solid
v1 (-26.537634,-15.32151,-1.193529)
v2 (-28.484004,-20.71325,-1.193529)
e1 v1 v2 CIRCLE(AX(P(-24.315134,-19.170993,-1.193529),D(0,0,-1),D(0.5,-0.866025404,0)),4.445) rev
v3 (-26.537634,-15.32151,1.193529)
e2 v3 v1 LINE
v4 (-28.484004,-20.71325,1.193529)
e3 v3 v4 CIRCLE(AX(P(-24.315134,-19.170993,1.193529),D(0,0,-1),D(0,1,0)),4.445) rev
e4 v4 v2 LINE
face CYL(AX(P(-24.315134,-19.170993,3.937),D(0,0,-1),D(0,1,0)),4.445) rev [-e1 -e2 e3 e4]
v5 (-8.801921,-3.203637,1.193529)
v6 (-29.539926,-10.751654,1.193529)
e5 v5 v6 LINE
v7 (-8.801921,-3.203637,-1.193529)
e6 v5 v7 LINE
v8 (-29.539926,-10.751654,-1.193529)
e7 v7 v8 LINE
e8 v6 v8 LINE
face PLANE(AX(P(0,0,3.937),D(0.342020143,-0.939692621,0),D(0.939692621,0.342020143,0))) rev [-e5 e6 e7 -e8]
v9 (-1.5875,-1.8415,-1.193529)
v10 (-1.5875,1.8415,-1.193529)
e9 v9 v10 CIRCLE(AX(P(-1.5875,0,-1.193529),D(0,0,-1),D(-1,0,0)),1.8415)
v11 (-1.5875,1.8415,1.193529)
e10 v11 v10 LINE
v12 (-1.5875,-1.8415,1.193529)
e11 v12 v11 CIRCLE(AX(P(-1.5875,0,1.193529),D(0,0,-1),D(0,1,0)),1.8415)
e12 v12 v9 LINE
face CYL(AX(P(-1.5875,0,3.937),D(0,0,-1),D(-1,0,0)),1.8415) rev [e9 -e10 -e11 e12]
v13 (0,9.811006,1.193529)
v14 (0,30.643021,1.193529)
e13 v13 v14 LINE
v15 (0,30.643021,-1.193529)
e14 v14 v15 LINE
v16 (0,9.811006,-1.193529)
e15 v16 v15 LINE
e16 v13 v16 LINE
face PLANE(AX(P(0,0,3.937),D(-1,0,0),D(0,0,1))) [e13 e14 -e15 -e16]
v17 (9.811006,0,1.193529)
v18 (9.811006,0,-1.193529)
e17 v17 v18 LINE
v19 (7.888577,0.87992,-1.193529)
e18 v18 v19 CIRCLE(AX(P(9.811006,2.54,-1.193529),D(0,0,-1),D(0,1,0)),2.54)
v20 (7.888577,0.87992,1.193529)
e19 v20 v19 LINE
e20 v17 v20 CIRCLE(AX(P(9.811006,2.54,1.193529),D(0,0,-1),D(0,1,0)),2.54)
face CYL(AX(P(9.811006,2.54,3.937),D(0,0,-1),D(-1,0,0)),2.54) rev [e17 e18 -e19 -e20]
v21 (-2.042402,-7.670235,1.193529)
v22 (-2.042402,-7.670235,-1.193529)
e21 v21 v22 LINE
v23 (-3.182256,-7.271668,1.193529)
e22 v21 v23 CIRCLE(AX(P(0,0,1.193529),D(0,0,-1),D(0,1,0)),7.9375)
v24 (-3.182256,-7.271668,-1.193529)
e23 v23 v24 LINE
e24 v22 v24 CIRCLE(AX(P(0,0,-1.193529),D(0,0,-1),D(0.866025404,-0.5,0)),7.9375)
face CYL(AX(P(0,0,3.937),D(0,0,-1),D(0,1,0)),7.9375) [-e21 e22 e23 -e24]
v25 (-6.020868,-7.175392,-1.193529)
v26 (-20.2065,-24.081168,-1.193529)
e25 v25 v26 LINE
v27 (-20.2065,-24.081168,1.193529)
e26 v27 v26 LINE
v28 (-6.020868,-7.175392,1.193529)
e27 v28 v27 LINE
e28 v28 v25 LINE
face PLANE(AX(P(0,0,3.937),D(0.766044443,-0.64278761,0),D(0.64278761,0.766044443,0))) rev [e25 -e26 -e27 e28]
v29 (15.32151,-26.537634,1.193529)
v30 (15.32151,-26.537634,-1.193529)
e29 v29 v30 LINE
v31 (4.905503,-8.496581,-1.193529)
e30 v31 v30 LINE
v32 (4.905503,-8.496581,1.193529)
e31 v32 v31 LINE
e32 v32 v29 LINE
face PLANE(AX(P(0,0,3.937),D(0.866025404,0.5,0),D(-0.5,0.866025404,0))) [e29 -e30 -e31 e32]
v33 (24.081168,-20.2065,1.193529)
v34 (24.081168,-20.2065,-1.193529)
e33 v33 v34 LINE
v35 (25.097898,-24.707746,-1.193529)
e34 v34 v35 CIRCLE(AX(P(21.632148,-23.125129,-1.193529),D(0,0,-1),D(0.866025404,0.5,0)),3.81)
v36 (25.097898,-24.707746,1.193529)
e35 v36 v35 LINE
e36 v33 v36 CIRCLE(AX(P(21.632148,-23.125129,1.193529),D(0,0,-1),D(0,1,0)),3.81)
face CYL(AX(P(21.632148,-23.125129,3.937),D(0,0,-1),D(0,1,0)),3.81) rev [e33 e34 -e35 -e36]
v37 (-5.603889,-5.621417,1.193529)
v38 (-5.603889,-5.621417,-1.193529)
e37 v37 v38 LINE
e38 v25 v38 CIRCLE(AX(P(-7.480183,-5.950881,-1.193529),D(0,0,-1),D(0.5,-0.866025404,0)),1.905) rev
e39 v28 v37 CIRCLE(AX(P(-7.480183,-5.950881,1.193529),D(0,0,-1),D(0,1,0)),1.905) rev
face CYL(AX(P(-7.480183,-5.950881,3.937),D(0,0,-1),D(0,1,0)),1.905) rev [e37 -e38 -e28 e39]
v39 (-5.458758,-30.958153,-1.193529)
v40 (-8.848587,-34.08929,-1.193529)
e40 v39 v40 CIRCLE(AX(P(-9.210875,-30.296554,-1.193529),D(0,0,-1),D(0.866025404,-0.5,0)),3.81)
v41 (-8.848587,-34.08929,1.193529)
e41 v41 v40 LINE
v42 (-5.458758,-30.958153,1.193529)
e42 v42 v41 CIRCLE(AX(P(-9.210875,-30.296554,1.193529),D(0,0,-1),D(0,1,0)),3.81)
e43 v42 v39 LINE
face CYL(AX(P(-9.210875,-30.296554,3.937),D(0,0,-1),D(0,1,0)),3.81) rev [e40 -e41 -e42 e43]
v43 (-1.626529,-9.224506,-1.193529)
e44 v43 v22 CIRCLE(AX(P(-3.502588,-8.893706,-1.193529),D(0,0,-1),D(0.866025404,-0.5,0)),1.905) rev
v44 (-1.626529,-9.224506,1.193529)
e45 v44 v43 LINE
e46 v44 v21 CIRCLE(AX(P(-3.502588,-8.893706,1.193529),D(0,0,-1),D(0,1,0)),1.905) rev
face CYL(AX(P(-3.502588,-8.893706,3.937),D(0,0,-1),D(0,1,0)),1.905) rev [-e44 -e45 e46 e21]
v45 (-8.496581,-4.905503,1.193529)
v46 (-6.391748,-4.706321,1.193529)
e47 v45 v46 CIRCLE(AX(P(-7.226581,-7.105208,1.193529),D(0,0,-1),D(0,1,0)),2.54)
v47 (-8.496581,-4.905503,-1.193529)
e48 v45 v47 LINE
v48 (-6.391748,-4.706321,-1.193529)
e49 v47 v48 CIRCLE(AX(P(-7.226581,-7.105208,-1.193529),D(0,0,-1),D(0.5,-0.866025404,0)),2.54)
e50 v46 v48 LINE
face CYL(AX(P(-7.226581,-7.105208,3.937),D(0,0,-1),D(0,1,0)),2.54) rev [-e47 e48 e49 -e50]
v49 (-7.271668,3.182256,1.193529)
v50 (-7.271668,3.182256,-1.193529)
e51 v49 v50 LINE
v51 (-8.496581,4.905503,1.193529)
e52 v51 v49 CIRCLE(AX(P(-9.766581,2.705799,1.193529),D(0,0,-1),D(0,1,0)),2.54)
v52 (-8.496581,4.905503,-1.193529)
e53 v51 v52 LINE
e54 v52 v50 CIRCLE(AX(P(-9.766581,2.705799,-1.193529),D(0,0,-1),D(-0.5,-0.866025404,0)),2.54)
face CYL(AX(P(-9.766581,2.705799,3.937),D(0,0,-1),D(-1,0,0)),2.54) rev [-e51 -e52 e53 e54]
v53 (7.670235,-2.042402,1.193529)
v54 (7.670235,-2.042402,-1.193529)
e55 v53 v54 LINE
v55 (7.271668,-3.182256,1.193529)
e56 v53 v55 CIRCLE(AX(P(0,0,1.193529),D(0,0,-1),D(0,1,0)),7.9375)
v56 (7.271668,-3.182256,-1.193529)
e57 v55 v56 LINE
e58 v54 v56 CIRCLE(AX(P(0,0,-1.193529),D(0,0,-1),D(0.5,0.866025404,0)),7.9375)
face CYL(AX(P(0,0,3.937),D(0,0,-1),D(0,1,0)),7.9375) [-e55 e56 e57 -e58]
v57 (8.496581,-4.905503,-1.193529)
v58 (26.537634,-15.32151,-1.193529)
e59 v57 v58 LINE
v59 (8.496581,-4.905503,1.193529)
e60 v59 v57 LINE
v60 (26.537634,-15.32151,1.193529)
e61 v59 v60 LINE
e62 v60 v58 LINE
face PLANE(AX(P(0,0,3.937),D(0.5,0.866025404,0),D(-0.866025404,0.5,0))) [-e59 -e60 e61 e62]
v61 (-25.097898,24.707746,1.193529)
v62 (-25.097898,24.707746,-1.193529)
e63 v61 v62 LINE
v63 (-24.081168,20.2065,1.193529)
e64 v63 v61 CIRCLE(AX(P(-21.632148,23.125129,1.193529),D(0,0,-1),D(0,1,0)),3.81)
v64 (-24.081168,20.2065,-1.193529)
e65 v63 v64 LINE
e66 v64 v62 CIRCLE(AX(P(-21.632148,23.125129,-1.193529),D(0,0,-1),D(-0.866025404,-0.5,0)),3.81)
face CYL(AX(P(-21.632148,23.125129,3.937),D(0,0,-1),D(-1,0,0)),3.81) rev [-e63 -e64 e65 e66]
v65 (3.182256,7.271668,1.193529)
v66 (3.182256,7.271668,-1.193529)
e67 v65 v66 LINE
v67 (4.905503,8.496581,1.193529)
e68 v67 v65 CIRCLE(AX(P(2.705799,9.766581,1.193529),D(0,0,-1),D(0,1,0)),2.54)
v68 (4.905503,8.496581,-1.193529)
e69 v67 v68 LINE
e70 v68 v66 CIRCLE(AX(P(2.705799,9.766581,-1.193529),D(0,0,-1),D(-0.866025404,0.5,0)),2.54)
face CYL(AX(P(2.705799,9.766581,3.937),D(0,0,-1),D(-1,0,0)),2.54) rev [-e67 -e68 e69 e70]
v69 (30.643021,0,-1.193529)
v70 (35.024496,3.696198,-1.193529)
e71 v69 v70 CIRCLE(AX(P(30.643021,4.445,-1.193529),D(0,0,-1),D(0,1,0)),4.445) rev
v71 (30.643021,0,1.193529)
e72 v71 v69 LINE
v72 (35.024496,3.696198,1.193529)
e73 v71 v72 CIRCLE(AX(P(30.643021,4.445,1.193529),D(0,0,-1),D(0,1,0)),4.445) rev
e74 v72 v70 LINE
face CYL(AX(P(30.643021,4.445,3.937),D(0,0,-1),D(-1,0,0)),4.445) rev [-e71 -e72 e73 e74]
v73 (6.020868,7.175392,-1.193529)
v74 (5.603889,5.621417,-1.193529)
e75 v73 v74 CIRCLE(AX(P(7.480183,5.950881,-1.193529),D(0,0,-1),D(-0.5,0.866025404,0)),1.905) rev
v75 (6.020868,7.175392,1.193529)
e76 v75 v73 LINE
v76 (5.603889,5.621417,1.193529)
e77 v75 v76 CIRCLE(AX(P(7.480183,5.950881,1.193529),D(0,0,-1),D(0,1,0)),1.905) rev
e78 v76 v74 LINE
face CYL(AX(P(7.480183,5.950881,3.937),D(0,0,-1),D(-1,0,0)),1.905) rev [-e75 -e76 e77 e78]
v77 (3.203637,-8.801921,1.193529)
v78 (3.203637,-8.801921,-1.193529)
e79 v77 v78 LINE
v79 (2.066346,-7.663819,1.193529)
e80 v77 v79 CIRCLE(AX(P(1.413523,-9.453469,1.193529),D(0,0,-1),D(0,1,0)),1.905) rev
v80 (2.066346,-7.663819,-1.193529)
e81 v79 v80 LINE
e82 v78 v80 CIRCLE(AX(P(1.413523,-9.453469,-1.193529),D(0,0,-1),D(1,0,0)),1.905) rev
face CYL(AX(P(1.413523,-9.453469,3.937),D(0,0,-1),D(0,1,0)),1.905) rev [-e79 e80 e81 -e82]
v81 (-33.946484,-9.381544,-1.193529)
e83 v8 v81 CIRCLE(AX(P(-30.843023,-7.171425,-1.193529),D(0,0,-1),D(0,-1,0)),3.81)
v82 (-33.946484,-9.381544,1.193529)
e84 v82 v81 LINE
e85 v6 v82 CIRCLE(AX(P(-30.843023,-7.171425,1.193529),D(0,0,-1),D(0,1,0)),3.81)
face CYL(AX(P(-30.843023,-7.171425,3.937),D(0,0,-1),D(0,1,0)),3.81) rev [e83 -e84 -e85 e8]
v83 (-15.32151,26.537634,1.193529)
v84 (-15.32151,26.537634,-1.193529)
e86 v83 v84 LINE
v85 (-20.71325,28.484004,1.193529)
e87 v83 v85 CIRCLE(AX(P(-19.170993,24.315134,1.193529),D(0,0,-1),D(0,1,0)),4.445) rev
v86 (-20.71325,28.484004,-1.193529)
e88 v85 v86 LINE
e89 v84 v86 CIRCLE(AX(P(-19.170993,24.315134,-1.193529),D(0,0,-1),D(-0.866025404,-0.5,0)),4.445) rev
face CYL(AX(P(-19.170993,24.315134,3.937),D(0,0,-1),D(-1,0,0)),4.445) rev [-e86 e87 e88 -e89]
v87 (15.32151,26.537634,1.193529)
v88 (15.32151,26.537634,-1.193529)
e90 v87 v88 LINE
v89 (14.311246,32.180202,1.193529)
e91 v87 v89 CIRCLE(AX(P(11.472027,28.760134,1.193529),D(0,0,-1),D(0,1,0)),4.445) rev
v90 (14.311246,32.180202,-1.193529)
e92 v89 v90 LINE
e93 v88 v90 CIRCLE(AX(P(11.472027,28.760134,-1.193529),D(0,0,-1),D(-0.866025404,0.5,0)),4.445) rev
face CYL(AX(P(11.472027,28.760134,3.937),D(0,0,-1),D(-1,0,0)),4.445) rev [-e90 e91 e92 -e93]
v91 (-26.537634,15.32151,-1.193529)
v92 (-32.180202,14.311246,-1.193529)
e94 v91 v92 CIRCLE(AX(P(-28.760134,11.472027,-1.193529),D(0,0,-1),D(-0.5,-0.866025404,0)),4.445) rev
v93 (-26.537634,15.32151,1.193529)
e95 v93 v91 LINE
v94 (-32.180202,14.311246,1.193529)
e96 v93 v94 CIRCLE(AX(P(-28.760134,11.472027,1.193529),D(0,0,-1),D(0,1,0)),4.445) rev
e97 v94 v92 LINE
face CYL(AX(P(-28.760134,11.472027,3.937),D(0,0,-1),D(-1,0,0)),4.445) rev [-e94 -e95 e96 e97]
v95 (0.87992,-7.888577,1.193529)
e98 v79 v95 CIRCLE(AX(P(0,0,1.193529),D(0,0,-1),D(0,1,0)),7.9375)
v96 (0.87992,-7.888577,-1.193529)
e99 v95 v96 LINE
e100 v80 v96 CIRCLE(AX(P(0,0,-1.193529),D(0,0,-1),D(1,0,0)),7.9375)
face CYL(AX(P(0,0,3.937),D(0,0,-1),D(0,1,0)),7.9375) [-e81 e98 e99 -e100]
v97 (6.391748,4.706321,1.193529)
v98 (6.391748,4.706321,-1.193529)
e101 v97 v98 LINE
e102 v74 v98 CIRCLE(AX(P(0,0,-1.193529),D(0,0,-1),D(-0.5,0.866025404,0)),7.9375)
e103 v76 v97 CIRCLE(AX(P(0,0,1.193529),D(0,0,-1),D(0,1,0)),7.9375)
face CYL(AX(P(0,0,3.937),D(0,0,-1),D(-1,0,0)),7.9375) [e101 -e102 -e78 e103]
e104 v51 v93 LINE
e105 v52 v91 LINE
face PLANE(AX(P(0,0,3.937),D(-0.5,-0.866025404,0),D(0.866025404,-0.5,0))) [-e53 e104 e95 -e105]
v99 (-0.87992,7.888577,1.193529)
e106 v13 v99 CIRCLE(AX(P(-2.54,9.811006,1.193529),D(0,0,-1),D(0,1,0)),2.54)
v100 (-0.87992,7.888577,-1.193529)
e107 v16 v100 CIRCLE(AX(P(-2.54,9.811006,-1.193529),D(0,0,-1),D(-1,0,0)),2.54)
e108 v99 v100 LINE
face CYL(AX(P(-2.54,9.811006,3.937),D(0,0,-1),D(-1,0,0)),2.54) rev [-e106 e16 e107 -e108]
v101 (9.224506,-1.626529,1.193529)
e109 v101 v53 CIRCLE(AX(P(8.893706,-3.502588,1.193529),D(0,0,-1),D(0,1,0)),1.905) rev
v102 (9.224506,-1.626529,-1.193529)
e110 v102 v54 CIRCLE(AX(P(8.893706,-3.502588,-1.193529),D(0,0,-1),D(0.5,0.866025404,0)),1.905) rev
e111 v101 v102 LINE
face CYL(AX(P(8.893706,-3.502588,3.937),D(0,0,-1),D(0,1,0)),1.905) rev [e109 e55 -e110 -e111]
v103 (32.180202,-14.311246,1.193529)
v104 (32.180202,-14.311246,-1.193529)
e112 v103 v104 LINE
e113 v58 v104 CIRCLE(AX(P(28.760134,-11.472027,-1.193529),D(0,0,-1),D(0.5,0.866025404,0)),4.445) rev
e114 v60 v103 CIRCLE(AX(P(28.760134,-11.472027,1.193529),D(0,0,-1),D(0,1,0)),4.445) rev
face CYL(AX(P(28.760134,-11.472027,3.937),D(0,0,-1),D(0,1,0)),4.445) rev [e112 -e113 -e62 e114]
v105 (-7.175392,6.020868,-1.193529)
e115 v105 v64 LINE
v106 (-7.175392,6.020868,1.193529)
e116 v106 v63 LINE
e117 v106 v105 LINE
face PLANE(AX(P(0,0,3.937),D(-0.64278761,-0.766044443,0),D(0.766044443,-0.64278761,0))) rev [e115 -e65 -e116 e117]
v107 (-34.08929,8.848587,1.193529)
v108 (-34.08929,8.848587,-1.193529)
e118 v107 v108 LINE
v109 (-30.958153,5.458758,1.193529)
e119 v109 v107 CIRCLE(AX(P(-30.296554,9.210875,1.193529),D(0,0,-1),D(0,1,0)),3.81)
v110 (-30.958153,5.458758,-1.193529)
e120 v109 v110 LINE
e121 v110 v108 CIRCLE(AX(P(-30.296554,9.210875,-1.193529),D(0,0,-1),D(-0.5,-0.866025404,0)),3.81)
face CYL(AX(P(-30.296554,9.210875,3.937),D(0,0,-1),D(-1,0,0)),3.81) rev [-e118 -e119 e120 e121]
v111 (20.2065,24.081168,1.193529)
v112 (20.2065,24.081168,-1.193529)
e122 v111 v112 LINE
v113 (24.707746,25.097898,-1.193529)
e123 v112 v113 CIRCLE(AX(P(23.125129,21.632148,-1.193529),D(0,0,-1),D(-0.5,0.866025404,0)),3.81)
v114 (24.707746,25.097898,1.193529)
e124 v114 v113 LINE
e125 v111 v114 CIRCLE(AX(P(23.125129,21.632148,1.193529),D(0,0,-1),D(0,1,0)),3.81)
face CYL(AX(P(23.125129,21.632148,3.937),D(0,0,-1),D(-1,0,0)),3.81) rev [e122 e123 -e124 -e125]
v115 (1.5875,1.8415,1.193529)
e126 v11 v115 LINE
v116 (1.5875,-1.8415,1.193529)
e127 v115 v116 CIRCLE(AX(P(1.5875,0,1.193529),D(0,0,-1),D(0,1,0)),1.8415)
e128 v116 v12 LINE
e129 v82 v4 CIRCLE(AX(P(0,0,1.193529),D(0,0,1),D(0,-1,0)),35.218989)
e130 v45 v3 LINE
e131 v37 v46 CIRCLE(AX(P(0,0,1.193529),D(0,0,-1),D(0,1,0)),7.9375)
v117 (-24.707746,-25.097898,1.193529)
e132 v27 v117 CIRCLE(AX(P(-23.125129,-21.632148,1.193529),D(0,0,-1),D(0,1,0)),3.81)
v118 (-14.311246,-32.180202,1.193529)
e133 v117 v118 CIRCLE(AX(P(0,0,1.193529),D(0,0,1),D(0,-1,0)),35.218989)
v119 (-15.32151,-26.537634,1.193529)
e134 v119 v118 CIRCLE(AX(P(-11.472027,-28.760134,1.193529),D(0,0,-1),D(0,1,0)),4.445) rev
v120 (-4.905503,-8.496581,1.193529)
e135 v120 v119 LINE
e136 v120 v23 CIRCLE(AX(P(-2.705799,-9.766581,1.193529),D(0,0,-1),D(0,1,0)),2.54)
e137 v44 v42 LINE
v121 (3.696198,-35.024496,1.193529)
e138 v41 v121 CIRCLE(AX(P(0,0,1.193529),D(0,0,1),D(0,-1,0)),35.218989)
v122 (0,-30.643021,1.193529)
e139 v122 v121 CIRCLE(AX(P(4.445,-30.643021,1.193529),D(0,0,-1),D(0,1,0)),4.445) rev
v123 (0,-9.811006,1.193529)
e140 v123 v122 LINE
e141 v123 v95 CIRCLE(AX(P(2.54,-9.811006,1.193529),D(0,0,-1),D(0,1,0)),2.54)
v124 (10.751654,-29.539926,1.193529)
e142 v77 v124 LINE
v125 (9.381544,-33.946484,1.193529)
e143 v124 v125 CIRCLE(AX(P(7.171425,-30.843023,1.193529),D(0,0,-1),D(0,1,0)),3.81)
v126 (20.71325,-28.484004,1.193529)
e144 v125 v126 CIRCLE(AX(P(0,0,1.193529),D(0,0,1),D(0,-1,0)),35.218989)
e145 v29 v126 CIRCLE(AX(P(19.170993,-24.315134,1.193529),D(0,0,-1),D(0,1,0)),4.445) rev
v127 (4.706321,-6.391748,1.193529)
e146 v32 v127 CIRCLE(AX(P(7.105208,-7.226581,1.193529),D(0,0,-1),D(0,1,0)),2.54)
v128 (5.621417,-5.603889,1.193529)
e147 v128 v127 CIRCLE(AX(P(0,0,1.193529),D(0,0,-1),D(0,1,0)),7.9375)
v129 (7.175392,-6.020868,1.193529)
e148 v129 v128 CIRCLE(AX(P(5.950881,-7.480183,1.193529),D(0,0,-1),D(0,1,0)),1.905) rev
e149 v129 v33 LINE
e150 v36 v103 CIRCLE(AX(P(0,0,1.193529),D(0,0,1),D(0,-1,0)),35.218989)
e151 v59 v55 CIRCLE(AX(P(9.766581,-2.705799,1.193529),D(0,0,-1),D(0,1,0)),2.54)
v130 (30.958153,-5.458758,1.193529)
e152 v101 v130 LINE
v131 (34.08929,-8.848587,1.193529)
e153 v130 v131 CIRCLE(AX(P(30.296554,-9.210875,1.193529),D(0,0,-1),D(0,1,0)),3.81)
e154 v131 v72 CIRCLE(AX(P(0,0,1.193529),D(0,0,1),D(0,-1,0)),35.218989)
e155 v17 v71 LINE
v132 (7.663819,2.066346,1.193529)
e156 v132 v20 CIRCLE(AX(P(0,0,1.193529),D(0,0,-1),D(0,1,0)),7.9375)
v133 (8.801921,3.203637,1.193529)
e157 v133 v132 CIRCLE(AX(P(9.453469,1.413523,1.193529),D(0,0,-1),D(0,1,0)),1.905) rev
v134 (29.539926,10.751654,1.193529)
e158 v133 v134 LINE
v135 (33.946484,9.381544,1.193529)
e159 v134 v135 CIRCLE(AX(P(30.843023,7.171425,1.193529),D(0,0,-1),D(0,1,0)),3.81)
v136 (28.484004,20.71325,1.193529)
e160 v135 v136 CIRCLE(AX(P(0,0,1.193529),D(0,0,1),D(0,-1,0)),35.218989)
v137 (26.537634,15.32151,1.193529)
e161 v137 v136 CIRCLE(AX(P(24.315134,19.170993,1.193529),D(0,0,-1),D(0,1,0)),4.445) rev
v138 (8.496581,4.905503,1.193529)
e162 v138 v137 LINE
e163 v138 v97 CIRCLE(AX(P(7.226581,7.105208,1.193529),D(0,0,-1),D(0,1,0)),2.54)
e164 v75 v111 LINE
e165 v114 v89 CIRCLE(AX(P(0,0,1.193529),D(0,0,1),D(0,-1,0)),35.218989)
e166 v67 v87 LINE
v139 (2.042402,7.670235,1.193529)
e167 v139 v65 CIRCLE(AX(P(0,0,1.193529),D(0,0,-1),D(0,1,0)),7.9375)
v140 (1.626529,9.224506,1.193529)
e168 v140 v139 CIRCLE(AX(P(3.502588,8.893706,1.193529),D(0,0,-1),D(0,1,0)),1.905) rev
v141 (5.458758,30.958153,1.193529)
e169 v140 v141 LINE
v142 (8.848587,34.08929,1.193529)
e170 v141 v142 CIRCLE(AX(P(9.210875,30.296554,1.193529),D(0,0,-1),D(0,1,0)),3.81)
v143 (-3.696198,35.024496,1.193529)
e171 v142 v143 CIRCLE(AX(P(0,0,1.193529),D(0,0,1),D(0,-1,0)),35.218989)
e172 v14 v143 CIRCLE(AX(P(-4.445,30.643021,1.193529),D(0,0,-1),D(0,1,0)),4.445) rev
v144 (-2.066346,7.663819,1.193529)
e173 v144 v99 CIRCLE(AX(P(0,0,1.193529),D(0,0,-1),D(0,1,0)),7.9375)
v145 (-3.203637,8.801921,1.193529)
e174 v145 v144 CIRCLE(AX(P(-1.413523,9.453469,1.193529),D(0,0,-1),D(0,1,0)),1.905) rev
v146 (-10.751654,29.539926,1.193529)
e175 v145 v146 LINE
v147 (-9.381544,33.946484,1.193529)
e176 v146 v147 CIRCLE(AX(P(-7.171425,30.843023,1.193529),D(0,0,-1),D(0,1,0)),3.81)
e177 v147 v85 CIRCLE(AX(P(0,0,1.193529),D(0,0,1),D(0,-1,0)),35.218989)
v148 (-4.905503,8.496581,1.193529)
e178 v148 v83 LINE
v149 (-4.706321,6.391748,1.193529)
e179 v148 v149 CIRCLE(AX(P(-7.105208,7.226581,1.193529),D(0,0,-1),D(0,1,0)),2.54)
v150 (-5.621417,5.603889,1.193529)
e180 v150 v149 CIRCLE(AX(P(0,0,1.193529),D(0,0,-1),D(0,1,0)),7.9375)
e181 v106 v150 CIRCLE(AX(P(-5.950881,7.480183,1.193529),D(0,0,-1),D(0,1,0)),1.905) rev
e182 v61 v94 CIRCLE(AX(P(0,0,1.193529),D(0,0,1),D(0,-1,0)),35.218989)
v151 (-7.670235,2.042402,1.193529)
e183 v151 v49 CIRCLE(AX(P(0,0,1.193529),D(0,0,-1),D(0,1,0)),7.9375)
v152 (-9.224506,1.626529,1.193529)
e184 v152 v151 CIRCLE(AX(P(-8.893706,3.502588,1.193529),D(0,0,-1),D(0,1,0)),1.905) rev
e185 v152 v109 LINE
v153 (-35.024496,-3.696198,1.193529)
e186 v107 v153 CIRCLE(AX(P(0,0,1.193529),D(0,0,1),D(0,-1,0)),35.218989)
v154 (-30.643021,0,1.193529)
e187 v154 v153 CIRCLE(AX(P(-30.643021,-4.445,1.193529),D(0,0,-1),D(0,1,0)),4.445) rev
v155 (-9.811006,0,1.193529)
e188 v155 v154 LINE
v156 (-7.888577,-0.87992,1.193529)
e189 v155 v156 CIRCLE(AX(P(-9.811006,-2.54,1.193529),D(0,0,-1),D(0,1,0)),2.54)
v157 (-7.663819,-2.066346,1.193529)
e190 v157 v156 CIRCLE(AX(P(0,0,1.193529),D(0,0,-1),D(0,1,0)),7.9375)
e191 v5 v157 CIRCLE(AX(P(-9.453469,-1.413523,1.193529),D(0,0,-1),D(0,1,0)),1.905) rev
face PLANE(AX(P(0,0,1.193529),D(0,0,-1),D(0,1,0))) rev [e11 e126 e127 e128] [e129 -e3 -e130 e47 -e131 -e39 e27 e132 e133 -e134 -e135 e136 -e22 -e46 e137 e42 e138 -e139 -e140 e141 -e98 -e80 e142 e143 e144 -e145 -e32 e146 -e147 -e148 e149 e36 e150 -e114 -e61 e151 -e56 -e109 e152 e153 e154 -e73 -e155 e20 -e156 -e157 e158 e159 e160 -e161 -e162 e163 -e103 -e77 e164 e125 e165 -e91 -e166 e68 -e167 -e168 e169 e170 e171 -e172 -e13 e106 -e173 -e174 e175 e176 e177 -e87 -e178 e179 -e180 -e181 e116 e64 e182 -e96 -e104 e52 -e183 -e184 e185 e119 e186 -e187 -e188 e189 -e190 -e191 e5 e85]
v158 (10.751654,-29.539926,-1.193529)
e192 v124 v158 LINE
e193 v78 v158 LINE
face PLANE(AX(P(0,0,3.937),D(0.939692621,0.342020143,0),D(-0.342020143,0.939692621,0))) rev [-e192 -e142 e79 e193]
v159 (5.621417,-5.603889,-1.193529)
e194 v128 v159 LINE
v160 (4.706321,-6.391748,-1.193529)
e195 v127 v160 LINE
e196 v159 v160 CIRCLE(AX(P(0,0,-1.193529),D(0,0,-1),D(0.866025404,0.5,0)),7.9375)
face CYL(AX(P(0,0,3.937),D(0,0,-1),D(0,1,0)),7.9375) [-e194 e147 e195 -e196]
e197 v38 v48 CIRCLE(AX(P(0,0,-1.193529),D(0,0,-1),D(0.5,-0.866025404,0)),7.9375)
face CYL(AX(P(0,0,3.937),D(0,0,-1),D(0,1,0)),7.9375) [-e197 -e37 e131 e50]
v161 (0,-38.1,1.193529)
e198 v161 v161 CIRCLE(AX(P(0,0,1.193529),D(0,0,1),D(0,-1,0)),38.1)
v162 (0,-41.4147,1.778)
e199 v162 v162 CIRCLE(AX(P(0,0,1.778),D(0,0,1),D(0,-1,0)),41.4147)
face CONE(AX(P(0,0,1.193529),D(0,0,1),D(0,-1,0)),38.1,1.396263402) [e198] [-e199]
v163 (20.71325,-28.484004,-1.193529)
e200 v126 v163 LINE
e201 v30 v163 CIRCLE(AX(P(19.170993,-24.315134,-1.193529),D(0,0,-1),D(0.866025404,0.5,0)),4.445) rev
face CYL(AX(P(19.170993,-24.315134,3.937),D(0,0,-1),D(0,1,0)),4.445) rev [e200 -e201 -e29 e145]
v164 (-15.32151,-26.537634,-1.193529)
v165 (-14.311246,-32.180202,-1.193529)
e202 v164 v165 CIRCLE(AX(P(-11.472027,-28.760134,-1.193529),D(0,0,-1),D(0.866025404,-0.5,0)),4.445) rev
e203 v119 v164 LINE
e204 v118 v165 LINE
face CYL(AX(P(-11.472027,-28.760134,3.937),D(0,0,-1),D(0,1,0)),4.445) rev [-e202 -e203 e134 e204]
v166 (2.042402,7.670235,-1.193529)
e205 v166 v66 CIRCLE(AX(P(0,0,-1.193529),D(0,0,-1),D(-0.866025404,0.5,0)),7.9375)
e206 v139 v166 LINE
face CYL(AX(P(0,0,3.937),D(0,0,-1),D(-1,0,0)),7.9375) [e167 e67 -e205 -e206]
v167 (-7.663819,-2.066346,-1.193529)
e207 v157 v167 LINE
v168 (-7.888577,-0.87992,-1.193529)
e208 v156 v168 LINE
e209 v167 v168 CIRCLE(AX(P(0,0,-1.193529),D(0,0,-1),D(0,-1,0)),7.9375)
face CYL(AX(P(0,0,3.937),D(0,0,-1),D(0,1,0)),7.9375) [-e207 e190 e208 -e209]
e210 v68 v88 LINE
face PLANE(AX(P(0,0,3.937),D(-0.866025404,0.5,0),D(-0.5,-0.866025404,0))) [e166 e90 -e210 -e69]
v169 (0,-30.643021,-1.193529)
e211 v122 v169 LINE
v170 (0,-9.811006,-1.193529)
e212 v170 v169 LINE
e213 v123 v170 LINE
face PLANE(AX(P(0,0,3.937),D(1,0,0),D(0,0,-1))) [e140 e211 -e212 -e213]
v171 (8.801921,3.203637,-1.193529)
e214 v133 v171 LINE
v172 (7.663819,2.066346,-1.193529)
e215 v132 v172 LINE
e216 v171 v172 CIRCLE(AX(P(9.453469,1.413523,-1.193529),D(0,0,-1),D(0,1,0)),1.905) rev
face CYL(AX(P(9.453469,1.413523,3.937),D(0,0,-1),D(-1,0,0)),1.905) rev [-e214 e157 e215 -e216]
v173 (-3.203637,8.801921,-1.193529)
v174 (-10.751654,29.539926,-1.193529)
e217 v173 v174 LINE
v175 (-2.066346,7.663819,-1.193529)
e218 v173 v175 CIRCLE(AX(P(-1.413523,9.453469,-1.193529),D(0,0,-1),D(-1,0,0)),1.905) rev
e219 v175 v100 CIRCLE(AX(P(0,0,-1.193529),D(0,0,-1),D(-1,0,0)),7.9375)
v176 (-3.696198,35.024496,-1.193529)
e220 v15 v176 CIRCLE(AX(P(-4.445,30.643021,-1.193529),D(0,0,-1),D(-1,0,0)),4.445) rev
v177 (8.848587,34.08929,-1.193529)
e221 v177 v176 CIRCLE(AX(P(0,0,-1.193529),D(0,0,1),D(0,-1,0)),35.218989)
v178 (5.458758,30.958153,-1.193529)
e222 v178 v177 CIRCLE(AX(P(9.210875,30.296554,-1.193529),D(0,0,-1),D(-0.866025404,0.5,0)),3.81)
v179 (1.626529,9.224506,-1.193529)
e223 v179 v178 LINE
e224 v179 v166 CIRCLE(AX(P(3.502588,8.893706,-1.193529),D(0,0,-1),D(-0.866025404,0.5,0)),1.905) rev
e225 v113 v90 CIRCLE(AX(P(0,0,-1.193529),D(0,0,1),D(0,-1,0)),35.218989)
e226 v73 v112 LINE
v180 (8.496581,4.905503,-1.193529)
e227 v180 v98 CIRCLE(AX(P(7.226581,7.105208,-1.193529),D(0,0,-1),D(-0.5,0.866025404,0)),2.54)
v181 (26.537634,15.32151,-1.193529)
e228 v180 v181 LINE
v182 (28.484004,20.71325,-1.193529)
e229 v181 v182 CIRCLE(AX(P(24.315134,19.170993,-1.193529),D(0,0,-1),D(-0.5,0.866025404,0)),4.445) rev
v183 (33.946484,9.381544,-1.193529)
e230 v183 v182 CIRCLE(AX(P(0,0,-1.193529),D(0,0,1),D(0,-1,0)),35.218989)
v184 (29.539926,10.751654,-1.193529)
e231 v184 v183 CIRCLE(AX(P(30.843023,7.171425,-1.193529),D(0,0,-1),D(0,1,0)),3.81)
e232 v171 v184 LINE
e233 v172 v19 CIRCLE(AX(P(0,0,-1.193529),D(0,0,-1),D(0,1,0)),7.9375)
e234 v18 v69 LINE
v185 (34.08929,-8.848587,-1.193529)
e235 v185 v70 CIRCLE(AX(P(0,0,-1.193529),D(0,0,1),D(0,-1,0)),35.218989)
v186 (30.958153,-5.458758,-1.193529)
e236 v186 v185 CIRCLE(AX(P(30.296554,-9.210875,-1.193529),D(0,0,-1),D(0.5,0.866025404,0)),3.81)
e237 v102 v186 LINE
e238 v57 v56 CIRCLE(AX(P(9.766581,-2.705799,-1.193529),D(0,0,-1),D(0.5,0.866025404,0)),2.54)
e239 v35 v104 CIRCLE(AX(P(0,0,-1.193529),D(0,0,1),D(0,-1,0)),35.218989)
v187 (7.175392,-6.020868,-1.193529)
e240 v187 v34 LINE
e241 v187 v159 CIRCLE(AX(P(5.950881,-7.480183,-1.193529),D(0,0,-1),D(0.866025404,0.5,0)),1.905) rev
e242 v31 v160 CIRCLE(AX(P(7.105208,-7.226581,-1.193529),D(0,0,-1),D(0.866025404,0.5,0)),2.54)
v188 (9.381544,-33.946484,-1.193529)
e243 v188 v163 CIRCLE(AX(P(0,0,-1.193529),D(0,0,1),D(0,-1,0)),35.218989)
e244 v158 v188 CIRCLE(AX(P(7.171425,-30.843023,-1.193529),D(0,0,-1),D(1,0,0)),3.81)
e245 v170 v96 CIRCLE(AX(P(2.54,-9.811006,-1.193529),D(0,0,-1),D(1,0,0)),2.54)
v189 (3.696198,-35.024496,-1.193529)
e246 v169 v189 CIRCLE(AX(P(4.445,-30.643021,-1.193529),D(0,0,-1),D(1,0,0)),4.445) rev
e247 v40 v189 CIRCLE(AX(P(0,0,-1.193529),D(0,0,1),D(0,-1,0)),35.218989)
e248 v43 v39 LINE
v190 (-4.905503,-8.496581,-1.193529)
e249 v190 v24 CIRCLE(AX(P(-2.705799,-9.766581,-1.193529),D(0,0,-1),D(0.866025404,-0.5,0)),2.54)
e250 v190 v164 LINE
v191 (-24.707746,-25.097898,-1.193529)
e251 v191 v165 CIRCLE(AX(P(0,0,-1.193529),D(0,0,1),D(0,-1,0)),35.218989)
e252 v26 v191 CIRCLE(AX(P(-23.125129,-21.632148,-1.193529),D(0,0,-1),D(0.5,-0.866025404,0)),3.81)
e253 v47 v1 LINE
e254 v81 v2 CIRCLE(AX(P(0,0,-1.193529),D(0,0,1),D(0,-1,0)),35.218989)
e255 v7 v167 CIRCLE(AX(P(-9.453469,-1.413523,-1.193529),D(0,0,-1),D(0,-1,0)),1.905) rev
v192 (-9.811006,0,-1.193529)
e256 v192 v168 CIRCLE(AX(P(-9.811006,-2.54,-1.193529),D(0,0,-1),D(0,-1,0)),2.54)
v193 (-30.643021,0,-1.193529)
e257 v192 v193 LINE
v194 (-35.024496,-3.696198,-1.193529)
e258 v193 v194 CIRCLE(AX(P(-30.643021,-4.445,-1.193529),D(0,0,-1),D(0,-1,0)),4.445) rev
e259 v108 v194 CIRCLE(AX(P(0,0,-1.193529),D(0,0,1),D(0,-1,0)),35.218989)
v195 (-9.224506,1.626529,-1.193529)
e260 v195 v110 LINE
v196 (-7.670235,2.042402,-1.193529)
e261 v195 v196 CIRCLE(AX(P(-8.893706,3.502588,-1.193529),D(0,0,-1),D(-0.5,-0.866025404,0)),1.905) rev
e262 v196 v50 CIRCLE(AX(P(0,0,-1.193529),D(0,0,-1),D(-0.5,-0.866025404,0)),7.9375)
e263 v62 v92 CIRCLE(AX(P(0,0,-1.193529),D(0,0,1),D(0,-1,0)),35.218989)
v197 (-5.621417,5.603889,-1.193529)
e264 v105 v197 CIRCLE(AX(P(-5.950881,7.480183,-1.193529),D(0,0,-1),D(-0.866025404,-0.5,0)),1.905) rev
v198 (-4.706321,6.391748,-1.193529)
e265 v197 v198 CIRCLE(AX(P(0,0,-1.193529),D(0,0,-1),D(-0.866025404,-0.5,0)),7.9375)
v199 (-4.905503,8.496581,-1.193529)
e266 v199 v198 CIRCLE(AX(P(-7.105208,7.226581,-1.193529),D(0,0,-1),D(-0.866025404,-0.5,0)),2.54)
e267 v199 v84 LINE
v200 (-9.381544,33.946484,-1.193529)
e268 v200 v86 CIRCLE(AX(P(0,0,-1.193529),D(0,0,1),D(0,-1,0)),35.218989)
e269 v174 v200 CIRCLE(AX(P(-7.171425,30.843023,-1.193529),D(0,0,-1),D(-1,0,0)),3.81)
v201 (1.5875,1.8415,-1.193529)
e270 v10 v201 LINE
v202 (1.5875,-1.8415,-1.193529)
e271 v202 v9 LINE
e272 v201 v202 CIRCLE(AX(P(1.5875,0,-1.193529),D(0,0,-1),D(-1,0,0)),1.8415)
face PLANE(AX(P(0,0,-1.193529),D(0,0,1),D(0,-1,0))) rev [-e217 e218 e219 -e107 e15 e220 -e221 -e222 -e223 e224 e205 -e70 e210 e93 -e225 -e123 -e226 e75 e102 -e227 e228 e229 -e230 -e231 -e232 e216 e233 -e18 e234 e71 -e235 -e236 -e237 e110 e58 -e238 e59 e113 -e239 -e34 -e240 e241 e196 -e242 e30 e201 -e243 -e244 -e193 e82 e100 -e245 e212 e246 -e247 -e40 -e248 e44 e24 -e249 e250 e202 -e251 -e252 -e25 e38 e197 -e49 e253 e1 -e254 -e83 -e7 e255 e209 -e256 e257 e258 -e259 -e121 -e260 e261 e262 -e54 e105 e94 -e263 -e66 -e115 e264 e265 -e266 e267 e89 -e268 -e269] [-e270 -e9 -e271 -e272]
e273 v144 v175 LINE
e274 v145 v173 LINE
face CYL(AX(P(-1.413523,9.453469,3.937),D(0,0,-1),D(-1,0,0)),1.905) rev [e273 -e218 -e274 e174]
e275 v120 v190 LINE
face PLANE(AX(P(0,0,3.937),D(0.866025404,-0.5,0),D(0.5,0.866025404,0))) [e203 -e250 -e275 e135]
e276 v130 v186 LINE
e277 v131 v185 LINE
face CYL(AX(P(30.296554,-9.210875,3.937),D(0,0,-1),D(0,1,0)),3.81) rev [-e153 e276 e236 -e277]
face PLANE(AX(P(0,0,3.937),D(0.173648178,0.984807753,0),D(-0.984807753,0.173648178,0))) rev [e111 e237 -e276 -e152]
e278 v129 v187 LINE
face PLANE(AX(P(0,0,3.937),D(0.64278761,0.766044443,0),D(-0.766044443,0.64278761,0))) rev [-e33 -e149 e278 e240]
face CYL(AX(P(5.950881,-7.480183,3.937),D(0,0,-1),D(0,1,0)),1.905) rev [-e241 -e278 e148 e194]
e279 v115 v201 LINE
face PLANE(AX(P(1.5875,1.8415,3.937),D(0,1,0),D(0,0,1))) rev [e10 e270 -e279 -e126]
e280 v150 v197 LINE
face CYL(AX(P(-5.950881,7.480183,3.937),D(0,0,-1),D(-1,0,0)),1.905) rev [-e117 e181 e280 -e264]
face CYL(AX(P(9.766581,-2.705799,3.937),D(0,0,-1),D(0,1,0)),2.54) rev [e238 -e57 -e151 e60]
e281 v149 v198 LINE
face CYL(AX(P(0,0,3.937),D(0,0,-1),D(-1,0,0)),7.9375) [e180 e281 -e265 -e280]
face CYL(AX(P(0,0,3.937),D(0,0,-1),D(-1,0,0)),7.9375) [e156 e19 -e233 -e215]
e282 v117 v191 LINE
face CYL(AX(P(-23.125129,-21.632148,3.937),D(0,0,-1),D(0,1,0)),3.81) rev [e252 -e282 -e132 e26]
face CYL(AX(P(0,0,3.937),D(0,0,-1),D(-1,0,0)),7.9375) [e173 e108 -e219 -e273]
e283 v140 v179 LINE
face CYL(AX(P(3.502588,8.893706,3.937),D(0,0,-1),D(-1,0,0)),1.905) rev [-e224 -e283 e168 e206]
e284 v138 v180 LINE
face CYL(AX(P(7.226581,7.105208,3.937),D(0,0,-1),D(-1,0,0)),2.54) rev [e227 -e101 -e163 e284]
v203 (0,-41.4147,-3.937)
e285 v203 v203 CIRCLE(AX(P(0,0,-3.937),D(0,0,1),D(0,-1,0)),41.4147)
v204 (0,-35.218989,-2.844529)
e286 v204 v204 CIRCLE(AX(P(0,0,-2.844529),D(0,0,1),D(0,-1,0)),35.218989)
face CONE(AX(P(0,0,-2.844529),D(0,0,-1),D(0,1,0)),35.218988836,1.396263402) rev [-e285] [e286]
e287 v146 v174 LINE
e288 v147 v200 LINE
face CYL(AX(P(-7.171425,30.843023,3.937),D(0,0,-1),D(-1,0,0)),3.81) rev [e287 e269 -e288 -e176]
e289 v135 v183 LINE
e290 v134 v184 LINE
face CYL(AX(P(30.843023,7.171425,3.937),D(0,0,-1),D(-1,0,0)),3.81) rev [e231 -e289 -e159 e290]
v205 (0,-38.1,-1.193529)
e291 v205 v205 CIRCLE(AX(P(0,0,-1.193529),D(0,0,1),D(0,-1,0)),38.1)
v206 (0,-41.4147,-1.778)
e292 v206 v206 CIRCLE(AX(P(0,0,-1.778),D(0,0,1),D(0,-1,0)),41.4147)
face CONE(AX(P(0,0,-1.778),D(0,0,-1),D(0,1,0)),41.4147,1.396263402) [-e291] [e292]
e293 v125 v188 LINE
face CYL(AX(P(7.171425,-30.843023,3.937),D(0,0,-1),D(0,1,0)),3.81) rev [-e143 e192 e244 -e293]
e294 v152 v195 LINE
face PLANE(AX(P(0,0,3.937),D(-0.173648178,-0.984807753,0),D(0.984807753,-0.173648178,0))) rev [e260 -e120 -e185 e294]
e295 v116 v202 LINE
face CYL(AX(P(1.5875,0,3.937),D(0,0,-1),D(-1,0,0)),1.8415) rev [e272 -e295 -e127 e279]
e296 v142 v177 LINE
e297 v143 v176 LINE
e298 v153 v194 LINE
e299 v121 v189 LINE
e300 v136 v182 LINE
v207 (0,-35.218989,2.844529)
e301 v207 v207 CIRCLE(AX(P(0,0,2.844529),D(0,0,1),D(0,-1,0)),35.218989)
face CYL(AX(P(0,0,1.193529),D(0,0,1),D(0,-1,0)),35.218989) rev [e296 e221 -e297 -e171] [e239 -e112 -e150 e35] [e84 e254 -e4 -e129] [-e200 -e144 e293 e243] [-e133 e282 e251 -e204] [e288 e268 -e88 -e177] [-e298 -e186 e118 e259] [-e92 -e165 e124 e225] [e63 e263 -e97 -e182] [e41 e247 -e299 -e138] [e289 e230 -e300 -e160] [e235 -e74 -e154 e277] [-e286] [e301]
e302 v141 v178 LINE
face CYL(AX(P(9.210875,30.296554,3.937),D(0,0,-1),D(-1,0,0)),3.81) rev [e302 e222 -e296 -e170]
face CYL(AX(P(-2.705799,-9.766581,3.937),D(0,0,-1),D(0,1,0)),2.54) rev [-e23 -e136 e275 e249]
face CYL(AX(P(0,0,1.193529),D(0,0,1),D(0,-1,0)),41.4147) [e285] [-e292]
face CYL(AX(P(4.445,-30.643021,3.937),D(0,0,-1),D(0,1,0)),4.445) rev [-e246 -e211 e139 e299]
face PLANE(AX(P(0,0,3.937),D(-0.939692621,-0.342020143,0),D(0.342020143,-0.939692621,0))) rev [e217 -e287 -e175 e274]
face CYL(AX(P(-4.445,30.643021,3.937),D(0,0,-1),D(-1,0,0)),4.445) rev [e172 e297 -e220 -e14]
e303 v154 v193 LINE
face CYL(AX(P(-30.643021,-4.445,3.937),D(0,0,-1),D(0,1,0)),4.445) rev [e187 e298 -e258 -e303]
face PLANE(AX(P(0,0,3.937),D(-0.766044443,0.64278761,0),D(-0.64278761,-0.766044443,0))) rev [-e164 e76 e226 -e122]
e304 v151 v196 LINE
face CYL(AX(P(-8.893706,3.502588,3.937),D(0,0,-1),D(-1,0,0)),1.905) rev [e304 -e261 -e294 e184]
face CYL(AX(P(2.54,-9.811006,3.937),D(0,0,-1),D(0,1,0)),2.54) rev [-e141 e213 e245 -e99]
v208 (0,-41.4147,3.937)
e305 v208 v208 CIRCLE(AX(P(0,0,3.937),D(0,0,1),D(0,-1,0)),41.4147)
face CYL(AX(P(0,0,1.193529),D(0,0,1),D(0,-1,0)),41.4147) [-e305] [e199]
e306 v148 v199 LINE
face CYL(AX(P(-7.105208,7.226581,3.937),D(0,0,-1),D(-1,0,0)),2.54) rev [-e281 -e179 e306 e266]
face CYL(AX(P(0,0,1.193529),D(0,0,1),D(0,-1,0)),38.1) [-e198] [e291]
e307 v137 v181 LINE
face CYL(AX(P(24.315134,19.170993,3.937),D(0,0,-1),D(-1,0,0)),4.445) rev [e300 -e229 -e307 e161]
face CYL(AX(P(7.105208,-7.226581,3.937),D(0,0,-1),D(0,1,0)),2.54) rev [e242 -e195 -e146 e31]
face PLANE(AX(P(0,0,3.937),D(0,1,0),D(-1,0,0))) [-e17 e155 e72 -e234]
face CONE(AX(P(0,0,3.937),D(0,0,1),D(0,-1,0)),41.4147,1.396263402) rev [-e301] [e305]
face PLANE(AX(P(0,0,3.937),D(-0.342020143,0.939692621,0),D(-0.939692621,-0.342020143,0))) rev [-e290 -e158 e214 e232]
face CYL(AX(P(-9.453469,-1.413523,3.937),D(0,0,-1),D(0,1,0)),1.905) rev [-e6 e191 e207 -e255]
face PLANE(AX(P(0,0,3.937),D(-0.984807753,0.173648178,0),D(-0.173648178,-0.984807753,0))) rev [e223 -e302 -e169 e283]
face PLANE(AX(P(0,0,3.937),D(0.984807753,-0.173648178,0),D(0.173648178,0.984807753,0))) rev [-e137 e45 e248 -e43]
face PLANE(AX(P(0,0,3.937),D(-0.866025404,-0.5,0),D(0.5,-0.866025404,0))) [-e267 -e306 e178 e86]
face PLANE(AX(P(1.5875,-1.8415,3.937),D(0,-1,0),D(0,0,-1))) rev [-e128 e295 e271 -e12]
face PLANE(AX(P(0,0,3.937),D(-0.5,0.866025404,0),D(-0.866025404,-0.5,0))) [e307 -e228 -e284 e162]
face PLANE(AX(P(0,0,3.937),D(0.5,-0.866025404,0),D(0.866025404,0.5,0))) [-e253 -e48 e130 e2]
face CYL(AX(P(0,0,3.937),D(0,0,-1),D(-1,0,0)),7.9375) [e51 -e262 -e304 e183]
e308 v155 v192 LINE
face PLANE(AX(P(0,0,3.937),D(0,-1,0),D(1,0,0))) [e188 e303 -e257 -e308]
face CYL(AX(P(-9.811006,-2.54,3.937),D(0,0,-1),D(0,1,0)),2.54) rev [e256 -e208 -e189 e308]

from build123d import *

# Parameters (mm, degrees)
CUT_EXTRUDE3_START = -2.387057914
CUT_EXTRUDE3_DEPTH = 2.387057914
CIRPATTERN2_COUNT  = 12
CUT_EXTRUDE4_DEPTH = 59.793512223


# Read off the part's stored shape, not the designer's step: Cut-Extrude3
with BuildPart() as part:
    # Sketch1 → Revolve1 (revolve)
    with BuildSketch(Plane(origin=(0, 0, 0), x_dir=(0, 0, -1), z_dir=(1, 0, 0)), mode=Mode.PRIVATE) as revolve1_sk:
        Polygon((-1.193528957, 0), (-1.193528957, 35.218988836), (-2.844528957, 35.218988836), (-3.937, 41.4147), (-1.778, 41.4147), (-1.193528957, 38.1), (1.193528957, 38.1), (1.778, 41.4147), (3.937, 41.4147), (2.844528957, 35.218988836), (1.193528957, 35.218988836), (1.193528957, 0), align=None)
    revolve(revolve1_sk.sketch.rotate(Axis((0, 0, 1.193528957), (0, 0, -1)), 180), axis=Axis((0, 0, 1.193528957), (0, 0, -1)))

    # Cut-Extrude3 outline → Cut-Extrude3 (cut)
    with BuildSketch(Plane(origin=(0, 0, -1.193528957), x_dir=(-1, 0, 0), z_dir=(0, 0, -1)).offset(CUT_EXTRUDE3_START)):
        with BuildLine():
            ThreePointArc((2.066345579, 7.663819035), (2.76104062, 8.106910335), (3.203637142, 8.801920708))
            Line((3.203637142, 8.801920708), (10.751653826, 29.539926109))
            ThreePointArc((10.751653826, 29.539926109), (10.809621103, 31.974229594), (9.381543944, 33.946484469))
            ThreePointArc((9.381543944, 33.946484469), (6.561048987, 34.602453827), (3.696198494, 35.02449559))
            ThreePointArc((3.696198494, 35.02449559), (1.047467977, 33.509168244), (0, 30.643020803))
            Line((0, 30.643020803), (0, 9.811006208))
            ThreePointArc((0, 9.811006208), (0.230432564, 8.753888306), (0.879919889, 7.88857701))
            ThreePointArc((0.879919889, 7.88857701), (1.477412972, 7.798792032), (2.066345579, 7.663819035))
        make_face()
    cut_extrude3 = extrude(amount=CUT_EXTRUDE3_DEPTH, mode=Mode.SUBTRACT)

    # CirPattern2: Cut-Extrude3 ×12 about axis
    cirpattern2_axis = Axis((0, 0, 0), (0, 0, 1))
    for i in range(1, CIRPATTERN2_COUNT):
        add(cut_extrude3.rotate(cirpattern2_axis, i * 360 / CIRPATTERN2_COUNT), mode=Mode.SUBTRACT)

    # Sketch2 → Cut-Extrude4 (cut, through all)
    with BuildSketch(Plane(origin=(0, 0, -1.193528957), x_dir=(-1, 0, 0), z_dir=(0, 0, -1))):
        with BuildLine():
            Line((-1.5875, 1.8415), (1.5875, 1.8415))
            ThreePointArc((1.5875, 1.8415), (3.429, 0), (1.5875, -1.8415))
            Line((1.5875, -1.8415), (-1.5875, -1.8415))
            ThreePointArc((-1.5875, -1.8415), (-3.429, 0), (-1.5875, 1.8415))
        make_face()
    extrude(amount=-CUT_EXTRUDE4_DEPTH, mode=Mode.SUBTRACT)


solid = part.part
